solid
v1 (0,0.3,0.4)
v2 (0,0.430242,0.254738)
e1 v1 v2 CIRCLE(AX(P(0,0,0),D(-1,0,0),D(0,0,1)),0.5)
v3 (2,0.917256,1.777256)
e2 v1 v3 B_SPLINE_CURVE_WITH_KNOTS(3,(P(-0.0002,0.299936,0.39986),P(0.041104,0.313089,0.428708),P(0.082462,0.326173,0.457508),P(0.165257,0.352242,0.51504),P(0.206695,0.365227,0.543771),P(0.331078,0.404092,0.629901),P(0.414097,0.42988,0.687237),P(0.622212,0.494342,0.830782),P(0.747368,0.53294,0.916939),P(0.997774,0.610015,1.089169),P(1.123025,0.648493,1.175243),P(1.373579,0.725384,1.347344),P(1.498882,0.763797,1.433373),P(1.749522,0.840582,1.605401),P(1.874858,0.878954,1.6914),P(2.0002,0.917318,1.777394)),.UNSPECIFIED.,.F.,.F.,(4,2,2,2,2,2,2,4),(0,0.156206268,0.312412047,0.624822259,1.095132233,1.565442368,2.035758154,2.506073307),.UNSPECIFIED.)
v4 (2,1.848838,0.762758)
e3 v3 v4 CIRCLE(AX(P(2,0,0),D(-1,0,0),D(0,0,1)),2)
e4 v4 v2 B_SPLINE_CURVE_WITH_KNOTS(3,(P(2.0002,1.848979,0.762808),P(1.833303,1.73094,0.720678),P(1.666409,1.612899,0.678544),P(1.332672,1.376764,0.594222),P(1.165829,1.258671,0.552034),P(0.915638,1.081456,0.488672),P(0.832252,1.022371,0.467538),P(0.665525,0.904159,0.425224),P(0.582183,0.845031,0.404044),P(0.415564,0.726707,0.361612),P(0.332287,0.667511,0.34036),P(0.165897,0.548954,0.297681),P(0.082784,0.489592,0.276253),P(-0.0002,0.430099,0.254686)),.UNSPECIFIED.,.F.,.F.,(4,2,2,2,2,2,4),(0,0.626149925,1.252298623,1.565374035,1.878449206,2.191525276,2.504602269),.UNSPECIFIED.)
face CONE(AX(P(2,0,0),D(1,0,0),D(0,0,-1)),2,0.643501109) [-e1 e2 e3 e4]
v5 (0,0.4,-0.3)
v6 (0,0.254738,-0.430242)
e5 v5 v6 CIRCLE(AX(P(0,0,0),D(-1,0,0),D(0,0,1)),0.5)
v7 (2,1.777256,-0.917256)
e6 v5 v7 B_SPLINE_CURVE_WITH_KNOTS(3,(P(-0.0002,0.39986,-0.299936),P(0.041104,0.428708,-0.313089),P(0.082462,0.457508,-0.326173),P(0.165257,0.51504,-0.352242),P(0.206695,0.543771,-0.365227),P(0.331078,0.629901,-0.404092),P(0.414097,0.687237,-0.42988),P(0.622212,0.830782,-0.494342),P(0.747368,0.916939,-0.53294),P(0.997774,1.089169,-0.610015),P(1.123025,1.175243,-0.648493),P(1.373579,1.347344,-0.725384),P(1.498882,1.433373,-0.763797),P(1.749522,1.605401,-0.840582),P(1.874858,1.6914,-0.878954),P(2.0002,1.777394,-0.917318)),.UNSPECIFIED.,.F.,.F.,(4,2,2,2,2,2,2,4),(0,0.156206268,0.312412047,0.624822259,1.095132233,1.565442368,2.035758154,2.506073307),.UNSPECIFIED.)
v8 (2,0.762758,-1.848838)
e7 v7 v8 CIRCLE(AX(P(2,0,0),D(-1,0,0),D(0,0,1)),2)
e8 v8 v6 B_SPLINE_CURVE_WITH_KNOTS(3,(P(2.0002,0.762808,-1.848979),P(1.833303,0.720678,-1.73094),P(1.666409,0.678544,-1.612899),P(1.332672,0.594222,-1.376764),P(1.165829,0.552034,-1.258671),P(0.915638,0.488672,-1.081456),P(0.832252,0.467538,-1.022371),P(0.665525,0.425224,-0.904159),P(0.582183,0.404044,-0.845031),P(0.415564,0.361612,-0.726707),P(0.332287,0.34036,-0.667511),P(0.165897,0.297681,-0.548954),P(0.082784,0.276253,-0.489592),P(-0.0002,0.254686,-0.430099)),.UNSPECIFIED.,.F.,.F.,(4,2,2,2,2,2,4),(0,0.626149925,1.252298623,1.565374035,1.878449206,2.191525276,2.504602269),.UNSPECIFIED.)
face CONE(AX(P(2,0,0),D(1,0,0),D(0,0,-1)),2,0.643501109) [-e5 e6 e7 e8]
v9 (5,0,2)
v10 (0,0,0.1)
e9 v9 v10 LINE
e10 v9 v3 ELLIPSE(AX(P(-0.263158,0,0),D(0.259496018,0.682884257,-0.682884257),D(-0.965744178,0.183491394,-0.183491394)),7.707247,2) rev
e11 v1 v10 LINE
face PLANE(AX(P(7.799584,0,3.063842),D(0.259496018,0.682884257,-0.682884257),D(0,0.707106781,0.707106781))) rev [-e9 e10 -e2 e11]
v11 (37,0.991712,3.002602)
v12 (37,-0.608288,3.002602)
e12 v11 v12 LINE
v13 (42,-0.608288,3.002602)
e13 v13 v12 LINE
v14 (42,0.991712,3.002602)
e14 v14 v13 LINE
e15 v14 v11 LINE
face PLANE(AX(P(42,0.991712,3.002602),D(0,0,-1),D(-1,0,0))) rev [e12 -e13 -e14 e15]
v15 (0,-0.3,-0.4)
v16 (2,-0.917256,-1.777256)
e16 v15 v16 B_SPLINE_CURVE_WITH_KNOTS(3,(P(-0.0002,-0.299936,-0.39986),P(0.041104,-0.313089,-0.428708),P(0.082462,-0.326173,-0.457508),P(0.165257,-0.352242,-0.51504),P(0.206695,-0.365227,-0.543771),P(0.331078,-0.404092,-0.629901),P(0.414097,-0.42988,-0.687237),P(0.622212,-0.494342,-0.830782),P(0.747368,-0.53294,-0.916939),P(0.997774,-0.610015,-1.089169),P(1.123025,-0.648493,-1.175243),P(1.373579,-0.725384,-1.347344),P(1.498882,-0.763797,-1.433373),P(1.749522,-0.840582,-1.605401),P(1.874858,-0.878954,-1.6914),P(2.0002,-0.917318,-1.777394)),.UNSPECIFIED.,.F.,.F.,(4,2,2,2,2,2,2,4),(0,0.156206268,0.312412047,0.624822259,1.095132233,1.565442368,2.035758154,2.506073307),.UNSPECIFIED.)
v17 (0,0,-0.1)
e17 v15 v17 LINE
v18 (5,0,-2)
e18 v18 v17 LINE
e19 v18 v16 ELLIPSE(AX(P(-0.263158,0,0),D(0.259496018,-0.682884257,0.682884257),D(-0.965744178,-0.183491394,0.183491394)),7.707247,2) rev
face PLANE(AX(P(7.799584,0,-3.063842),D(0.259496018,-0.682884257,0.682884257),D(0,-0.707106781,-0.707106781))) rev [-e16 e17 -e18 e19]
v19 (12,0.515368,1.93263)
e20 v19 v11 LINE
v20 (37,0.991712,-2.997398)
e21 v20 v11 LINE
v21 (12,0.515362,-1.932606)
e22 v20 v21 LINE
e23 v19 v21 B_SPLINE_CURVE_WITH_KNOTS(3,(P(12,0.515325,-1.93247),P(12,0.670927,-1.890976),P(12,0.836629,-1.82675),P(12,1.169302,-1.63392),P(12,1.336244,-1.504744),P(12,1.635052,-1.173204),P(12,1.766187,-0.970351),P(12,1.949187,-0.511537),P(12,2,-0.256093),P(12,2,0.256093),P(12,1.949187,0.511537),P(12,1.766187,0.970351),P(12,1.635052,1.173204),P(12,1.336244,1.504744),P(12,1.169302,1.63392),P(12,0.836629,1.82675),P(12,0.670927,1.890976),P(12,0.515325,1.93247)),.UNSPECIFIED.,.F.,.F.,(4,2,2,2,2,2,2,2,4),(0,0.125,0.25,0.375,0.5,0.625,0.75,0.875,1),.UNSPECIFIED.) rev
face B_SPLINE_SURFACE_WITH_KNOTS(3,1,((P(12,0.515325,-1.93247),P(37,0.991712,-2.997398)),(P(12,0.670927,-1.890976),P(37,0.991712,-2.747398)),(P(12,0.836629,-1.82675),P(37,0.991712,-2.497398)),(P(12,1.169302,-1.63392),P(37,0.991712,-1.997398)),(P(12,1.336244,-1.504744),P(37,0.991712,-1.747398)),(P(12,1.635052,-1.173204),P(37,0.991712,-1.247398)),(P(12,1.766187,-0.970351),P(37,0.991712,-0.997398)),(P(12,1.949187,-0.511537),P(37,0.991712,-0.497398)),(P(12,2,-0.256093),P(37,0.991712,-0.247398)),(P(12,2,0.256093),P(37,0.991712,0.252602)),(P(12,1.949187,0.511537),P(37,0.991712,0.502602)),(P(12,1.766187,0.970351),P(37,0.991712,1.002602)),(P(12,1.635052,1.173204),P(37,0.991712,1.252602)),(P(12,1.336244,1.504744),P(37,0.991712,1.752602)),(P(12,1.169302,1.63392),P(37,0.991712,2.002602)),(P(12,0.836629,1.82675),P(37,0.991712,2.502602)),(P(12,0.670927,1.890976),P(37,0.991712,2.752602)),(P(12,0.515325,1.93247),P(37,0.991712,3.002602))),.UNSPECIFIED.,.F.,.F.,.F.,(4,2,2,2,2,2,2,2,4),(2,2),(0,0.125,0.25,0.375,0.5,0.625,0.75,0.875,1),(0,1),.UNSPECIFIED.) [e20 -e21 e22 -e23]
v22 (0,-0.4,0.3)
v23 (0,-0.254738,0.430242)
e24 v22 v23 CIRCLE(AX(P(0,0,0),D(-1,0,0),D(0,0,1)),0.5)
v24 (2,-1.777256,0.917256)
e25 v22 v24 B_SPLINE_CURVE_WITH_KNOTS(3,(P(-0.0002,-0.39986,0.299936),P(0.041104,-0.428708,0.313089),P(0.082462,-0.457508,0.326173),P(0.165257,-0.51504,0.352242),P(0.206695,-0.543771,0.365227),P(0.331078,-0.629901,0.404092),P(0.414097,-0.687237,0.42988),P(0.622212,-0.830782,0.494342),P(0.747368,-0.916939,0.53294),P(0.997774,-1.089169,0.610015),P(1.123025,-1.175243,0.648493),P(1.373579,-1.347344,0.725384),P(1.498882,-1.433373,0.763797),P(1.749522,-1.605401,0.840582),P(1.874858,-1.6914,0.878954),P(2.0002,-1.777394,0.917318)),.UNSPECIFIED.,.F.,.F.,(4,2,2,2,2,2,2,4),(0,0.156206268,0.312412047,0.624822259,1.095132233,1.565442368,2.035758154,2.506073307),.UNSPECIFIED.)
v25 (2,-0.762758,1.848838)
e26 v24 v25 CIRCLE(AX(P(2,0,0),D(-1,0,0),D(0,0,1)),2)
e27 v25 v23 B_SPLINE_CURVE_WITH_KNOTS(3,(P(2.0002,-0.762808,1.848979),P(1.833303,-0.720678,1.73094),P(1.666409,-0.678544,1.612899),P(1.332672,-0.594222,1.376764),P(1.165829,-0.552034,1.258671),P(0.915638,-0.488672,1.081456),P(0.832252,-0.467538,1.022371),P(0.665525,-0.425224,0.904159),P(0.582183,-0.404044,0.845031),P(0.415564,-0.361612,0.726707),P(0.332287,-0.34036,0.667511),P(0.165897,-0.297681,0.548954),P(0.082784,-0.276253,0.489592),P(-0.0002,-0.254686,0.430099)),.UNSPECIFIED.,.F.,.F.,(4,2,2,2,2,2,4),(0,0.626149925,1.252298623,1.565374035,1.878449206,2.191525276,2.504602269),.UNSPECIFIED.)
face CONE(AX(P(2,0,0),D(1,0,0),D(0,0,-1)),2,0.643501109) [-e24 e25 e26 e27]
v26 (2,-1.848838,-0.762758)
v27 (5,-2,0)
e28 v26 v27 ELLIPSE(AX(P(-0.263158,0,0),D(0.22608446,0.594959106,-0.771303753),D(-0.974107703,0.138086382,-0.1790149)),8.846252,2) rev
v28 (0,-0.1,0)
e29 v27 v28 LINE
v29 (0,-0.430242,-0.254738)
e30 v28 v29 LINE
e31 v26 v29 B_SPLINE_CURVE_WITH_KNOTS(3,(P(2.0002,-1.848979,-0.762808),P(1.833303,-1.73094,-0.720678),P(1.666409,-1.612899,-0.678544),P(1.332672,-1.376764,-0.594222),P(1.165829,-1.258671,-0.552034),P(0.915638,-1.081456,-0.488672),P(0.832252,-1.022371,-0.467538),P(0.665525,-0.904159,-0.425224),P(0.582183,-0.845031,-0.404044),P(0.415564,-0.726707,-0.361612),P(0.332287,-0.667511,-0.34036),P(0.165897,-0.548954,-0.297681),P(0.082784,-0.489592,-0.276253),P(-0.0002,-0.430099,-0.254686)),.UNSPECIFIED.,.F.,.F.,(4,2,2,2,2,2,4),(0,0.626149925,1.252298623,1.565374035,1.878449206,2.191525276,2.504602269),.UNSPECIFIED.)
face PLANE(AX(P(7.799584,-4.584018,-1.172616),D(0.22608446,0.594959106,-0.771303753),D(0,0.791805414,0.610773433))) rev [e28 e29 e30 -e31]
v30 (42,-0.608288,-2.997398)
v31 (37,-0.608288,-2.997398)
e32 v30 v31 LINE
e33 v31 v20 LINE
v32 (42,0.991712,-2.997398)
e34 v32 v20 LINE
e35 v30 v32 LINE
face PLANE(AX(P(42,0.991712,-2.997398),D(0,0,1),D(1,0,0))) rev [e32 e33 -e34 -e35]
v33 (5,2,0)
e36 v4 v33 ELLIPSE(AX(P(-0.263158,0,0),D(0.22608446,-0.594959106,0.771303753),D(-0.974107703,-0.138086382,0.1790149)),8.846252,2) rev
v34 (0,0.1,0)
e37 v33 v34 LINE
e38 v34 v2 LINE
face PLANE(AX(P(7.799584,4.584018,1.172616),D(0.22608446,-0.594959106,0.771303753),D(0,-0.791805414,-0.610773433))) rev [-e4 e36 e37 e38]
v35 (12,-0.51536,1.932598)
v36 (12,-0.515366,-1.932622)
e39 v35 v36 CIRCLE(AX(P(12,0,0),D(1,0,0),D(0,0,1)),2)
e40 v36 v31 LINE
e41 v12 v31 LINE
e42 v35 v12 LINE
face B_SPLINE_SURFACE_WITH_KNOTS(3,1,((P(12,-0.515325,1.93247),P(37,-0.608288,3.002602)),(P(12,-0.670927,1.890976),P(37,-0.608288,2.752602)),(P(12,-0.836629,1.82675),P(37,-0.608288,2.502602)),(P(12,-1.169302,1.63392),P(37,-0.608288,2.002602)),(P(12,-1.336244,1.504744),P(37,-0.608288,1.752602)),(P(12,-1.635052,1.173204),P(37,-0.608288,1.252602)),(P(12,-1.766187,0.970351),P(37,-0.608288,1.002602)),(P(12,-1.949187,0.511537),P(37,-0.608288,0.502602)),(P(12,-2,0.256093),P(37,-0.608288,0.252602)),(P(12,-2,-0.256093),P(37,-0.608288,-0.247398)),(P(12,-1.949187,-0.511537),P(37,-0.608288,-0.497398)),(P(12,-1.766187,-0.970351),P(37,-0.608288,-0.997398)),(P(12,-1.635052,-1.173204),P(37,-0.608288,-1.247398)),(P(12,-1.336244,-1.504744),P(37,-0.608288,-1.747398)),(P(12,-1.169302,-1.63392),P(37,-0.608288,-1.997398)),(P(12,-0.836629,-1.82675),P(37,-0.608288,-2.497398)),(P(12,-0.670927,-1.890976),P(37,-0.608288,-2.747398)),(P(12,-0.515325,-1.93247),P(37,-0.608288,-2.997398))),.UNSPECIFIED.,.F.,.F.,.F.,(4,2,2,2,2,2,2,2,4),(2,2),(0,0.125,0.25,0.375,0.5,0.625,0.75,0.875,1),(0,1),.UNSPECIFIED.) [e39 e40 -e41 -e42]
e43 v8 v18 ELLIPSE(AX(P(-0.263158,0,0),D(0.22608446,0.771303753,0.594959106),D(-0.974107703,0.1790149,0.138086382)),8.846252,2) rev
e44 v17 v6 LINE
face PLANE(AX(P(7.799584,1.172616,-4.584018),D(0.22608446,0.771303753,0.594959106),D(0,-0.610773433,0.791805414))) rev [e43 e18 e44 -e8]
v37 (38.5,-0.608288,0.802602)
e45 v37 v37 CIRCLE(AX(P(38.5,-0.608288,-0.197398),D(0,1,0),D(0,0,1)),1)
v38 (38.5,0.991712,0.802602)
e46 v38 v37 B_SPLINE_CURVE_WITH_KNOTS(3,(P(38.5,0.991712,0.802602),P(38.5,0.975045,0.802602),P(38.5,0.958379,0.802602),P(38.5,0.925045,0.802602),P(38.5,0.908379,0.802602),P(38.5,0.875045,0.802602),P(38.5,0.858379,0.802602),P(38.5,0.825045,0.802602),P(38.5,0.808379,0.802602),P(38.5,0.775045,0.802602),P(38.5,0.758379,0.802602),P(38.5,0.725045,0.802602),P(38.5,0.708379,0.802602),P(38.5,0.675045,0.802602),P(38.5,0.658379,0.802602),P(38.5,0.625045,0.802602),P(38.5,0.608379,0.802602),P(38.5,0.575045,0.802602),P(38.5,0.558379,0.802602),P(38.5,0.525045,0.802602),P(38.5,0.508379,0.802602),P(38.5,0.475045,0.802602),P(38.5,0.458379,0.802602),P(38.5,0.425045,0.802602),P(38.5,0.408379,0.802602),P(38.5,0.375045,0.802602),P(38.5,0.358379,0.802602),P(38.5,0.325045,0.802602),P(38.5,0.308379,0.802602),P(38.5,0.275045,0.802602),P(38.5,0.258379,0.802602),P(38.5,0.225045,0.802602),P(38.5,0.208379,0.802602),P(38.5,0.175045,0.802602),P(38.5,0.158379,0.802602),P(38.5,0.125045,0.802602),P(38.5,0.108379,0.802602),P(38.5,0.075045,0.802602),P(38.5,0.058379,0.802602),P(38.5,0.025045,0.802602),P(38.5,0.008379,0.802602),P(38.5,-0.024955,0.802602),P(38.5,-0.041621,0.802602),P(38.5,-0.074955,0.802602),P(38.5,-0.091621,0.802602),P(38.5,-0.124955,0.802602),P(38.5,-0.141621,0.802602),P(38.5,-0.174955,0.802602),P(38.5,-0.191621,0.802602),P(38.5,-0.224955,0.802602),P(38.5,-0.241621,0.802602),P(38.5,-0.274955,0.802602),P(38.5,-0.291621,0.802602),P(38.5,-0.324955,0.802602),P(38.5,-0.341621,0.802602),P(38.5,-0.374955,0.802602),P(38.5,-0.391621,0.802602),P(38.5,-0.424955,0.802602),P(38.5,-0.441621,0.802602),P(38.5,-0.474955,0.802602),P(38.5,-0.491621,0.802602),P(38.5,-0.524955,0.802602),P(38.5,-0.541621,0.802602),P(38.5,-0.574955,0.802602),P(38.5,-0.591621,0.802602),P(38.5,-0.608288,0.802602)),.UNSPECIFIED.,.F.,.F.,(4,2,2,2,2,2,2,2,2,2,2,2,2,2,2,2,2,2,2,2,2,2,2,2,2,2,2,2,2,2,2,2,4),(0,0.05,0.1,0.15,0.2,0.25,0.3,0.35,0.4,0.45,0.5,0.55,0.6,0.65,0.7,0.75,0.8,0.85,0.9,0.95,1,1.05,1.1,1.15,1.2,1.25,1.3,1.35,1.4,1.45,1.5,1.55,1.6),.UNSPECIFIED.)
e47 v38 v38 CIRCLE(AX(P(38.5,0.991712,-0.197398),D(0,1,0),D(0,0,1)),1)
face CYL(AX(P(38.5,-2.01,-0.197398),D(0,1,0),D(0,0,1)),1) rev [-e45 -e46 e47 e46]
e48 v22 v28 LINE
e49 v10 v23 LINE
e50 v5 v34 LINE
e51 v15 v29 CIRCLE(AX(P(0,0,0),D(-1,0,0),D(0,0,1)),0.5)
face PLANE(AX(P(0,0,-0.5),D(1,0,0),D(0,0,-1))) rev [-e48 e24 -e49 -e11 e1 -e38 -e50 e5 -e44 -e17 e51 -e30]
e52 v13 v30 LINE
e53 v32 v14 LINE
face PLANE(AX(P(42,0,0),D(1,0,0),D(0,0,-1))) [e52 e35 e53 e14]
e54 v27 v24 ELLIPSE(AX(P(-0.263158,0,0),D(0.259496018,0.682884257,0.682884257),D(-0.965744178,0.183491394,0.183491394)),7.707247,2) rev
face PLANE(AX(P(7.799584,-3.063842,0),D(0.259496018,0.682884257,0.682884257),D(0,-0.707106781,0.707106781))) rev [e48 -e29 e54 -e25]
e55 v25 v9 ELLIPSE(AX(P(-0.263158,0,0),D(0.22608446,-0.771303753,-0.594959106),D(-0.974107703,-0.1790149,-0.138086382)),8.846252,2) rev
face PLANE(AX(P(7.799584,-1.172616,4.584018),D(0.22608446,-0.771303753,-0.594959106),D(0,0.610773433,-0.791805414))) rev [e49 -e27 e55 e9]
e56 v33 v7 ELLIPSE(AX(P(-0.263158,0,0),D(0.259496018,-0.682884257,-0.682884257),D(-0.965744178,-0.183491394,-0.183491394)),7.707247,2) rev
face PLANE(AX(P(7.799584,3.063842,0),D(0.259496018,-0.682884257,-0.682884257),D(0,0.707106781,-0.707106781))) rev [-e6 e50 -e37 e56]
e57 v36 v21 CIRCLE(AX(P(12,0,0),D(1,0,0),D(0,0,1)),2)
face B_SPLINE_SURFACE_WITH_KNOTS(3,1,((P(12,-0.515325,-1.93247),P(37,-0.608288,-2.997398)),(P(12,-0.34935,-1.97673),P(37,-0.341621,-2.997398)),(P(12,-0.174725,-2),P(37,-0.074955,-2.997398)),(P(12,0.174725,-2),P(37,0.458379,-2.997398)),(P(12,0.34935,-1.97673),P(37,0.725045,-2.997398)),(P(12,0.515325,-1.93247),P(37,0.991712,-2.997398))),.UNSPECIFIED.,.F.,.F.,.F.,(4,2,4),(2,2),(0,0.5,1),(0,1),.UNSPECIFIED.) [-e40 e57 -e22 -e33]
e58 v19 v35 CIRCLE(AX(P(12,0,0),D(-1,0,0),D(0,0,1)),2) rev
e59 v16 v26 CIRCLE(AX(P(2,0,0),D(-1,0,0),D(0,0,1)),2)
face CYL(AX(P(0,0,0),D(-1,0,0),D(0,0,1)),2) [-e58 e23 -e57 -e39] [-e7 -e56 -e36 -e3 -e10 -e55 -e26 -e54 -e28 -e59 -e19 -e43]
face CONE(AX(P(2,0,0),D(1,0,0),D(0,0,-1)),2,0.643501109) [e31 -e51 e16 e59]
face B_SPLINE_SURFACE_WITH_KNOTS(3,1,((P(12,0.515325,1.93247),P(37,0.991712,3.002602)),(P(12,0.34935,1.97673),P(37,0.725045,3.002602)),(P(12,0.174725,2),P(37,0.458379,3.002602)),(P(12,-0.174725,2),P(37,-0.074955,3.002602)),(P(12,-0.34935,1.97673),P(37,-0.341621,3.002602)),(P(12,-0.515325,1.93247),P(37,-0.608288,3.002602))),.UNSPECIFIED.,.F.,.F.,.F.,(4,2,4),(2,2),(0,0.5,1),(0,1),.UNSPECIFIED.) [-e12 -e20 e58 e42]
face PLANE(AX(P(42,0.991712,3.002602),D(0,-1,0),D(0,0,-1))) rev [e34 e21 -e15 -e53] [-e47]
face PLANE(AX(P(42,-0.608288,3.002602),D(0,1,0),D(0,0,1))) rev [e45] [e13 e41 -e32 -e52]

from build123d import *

# Parameters (mm, degrees)
CIRPATTERN11_COUNT  = 4
SKETCH6_W           = 6
SKETCH6_H           = 1.6
BOSS_EXTRUDE1_DEPTH = 5
SKETCH7_R           = 1
CUT_EXTRUDE1_DEPTH  = 43.213338788


with BuildPart() as part:
    # Sketch1 → Revolve1 (revolve)
    with BuildSketch(Plane(origin=(0, 0, 0), x_dir=(1, 0, 0), z_dir=(0, 1, 0)), mode=Mode.PRIVATE) as revolve1_sk:
        Polygon((0, 0), (12, 0), (12, 2), (2, 2), (0, 0.5), align=None)
    revolve(revolve1_sk.sketch.rotate(Axis((0, 0, 0), (1, 0, 0)), 180), axis=Axis((0, 0, 0), (1, 0, 0)))

    # Cut-Sweep1: sweep along a path in Sketch2
    with BuildLine(Plane(origin=(0, 0, 0), x_dir=(1, 0, 0), z_dir=(0, 1, 0))) as cut_sweep1_path:
        Line((5, 2), (0, 0.1))
    # Sketch3 → Cut-Sweep1 (sweep, cut)
    with BuildSketch(Plane.ZY):
        with BuildLine():
            Line((-1.620176628, 1.172615749), (-0.1, 0))
            Line((-0.1, 0), (-1.463329403, -1.363329403))
            ThreePointArc((-1.463329403, -1.363329403), (-1.996185566, -0.123463304), (-1.620176628, 1.172615749))
        make_face()
    cut_sweep1 = sweep(path=cut_sweep1_path.line, mode=Mode.SUBTRACT)

    # CirPattern11: Cut-Sweep1 ×4 about axis
    cirpattern11_axis = Axis((0, 0, 0), (1, 0, 0))
    for i in range(1, CIRPATTERN11_COUNT):
        add(cut_sweep1.rotate(cirpattern11_axis, i * 360 / CIRPATTERN11_COUNT), mode=Mode.SUBTRACT)

    # Loft1: read off the stored shape, not the designer's step
    # Loft1: loft between two sections, ruled curve by curve
    loft1_from = [
        Edge.make_bspline([(12, 0.515325301, -1.932469879), (12, 0.670926961, -1.890976103), (12, 0.836629145, -1.826749948), (12, 1.169302436, -1.633920289), (12, 1.336243508, -1.504744064), (12, 1.635051973, -1.173203502), (12, 1.76618738, -0.970351469), (12, 1.949186886, -0.511537213), (12, 2, -0.256092771), (12, 2, 0.256092771), (12, 1.949186886, 0.511537213), (12, 1.76618738, 0.970351469), (12, 1.635051973, 1.173203502), (12, 1.336243508, 1.504744064), (12, 1.169302436, 1.633920289), (12, 0.836629145, 1.826749948), (12, 0.670926961, 1.890976103), (12, 0.515325301, 1.932469879)], [0, 0, 0, 0, 0.125, 0.125, 0.25, 0.25, 0.375, 0.375, 0.5, 0.5, 0.625, 0.625, 0.75, 0.75, 0.875, 0.875, 1, 1, 1, 1], 3),
        Edge.make_bspline([(12, 0.515325301, 1.932469879), (12, 0.349350197, 1.976729907), (12, 0.174724899, 2), (12, -0.174724899, 2), (12, -0.349350197, 1.976729907), (12, -0.515325301, 1.932469879)], [0, 0, 0, 0, 0.5, 0.5, 1, 1, 1, 1], 3),
        Edge.make_bspline([(12, -0.515325301, -1.932469879), (12, -0.349350197, -1.976729907), (12, -0.174724899, -2), (12, 0.174724899, -2), (12, 0.349350197, -1.976729907), (12, 0.515325301, -1.932469879)], [0, 0, 0, 0, 0.5, 0.5, 1, 1, 1, 1], 3),
        Edge.make_bspline([(12, -0.515325301, 1.932469879), (12, -0.670926961, 1.890976103), (12, -0.836629145, 1.826749948), (12, -1.169302436, 1.633920289), (12, -1.336243508, 1.504744064), (12, -1.635051973, 1.173203502), (12, -1.76618738, 0.970351469), (12, -1.949186886, 0.511537213), (12, -2, 0.256092771), (12, -2, -0.256092771), (12, -1.949186886, -0.511537213), (12, -1.76618738, -0.970351469), (12, -1.635051973, -1.173203502), (12, -1.336243508, -1.504744064), (12, -1.169302436, -1.633920289), (12, -0.836629145, -1.826749948), (12, -0.670926961, -1.890976103), (12, -0.515325301, -1.932469879)], [0, 0, 0, 0, 0.125, 0.125, 0.25, 0.25, 0.375, 0.375, 0.5, 0.5, 0.625, 0.625, 0.75, 0.75, 0.875, 0.875, 1, 1, 1, 1], 3),
    ]
    loft1_to = [
        Edge.make_bspline([(37, 0.991712047, -2.997397622), (37, 0.991712047, -2.747397622), (37, 0.991712047, -2.497397622), (37, 0.991712047, -1.997397622), (37, 0.991712047, -1.747397622), (37, 0.991712047, -1.247397622), (37, 0.991712047, -0.997397622), (37, 0.991712047, -0.497397622), (37, 0.991712047, -0.247397622), (37, 0.991712047, 0.252602378), (37, 0.991712047, 0.502602378), (37, 0.991712047, 1.002602378), (37, 0.991712047, 1.252602378), (37, 0.991712047, 1.752602378), (37, 0.991712047, 2.002602378), (37, 0.991712047, 2.502602378), (37, 0.991712047, 2.752602378), (37, 0.991712047, 3.002602378)], [0, 0, 0, 0, 0.125, 0.125, 0.25, 0.25, 0.375, 0.375, 0.5, 0.5, 0.625, 0.625, 0.75, 0.75, 0.875, 0.875, 1, 1, 1, 1], 3),
        Edge.make_bspline([(37, 0.991712047, 3.002602378), (37, 0.725045381, 3.002602378), (37, 0.458378714, 3.002602378), (37, -0.074954619, 3.002602378), (37, -0.341621286, 3.002602378), (37, -0.608287953, 3.002602378)], [0, 0, 0, 0, 0.5, 0.5, 1, 1, 1, 1], 3),
        Edge.make_bspline([(37, -0.608287953, -2.997397622), (37, -0.341621286, -2.997397622), (37, -0.074954619, -2.997397622), (37, 0.458378714, -2.997397622), (37, 0.725045381, -2.997397622), (37, 0.991712047, -2.997397622)], [0, 0, 0, 0, 0.5, 0.5, 1, 1, 1, 1], 3),
        Edge.make_bspline([(37, -0.608287953, 3.002602378), (37, -0.608287953, 2.752602378), (37, -0.608287953, 2.502602378), (37, -0.608287953, 2.002602378), (37, -0.608287953, 1.752602378), (37, -0.608287953, 1.252602378), (37, -0.608287953, 1.002602378), (37, -0.608287953, 0.502602378), (37, -0.608287953, 0.252602378), (37, -0.608287953, -0.247397622), (37, -0.608287953, -0.497397622), (37, -0.608287953, -0.997397622), (37, -0.608287953, -1.247397622), (37, -0.608287953, -1.747397622), (37, -0.608287953, -1.997397622), (37, -0.608287953, -2.497397622), (37, -0.608287953, -2.747397622), (37, -0.608287953, -2.997397622)], [0, 0, 0, 0, 0.125, 0.125, 0.25, 0.25, 0.375, 0.375, 0.5, 0.5, 0.625, 0.625, 0.75, 0.75, 0.875, 0.875, 1, 1, 1, 1], 3),
    ]
    loft1 = Solid(Shell([*[Face.make_surface_from_curves(loft1_from[k], loft1_to[k]) for k in range(4)], Face(Wire(loft1_from)), Face(Wire(loft1_to))]))
    add(loft1)

    # Sketch6 → Boss-Extrude1 (add)
    with BuildSketch(Plane(origin=(37, 0, 0), x_dir=(0, 0, -1), z_dir=(1, 0, 0))):
        with Locations((-0.002602378, 0.191712047)):
            Rectangle(SKETCH6_W, SKETCH6_H)
    extrude(amount=BOSS_EXTRUDE1_DEPTH)

    # Sketch7 → Cut-Extrude1 (cut, through all)
    with BuildSketch(Plane(origin=(0, 0.991712047, 0), x_dir=(1, 0, 0), z_dir=(0, 1, 0))):
        with Locations(Location((38.5, 0.197397622, 0), (0, 0, 270))):
            Circle(SKETCH7_R)
    extrude(amount=-CUT_EXTRUDE1_DEPTH, mode=Mode.SUBTRACT)


solid = part.part
